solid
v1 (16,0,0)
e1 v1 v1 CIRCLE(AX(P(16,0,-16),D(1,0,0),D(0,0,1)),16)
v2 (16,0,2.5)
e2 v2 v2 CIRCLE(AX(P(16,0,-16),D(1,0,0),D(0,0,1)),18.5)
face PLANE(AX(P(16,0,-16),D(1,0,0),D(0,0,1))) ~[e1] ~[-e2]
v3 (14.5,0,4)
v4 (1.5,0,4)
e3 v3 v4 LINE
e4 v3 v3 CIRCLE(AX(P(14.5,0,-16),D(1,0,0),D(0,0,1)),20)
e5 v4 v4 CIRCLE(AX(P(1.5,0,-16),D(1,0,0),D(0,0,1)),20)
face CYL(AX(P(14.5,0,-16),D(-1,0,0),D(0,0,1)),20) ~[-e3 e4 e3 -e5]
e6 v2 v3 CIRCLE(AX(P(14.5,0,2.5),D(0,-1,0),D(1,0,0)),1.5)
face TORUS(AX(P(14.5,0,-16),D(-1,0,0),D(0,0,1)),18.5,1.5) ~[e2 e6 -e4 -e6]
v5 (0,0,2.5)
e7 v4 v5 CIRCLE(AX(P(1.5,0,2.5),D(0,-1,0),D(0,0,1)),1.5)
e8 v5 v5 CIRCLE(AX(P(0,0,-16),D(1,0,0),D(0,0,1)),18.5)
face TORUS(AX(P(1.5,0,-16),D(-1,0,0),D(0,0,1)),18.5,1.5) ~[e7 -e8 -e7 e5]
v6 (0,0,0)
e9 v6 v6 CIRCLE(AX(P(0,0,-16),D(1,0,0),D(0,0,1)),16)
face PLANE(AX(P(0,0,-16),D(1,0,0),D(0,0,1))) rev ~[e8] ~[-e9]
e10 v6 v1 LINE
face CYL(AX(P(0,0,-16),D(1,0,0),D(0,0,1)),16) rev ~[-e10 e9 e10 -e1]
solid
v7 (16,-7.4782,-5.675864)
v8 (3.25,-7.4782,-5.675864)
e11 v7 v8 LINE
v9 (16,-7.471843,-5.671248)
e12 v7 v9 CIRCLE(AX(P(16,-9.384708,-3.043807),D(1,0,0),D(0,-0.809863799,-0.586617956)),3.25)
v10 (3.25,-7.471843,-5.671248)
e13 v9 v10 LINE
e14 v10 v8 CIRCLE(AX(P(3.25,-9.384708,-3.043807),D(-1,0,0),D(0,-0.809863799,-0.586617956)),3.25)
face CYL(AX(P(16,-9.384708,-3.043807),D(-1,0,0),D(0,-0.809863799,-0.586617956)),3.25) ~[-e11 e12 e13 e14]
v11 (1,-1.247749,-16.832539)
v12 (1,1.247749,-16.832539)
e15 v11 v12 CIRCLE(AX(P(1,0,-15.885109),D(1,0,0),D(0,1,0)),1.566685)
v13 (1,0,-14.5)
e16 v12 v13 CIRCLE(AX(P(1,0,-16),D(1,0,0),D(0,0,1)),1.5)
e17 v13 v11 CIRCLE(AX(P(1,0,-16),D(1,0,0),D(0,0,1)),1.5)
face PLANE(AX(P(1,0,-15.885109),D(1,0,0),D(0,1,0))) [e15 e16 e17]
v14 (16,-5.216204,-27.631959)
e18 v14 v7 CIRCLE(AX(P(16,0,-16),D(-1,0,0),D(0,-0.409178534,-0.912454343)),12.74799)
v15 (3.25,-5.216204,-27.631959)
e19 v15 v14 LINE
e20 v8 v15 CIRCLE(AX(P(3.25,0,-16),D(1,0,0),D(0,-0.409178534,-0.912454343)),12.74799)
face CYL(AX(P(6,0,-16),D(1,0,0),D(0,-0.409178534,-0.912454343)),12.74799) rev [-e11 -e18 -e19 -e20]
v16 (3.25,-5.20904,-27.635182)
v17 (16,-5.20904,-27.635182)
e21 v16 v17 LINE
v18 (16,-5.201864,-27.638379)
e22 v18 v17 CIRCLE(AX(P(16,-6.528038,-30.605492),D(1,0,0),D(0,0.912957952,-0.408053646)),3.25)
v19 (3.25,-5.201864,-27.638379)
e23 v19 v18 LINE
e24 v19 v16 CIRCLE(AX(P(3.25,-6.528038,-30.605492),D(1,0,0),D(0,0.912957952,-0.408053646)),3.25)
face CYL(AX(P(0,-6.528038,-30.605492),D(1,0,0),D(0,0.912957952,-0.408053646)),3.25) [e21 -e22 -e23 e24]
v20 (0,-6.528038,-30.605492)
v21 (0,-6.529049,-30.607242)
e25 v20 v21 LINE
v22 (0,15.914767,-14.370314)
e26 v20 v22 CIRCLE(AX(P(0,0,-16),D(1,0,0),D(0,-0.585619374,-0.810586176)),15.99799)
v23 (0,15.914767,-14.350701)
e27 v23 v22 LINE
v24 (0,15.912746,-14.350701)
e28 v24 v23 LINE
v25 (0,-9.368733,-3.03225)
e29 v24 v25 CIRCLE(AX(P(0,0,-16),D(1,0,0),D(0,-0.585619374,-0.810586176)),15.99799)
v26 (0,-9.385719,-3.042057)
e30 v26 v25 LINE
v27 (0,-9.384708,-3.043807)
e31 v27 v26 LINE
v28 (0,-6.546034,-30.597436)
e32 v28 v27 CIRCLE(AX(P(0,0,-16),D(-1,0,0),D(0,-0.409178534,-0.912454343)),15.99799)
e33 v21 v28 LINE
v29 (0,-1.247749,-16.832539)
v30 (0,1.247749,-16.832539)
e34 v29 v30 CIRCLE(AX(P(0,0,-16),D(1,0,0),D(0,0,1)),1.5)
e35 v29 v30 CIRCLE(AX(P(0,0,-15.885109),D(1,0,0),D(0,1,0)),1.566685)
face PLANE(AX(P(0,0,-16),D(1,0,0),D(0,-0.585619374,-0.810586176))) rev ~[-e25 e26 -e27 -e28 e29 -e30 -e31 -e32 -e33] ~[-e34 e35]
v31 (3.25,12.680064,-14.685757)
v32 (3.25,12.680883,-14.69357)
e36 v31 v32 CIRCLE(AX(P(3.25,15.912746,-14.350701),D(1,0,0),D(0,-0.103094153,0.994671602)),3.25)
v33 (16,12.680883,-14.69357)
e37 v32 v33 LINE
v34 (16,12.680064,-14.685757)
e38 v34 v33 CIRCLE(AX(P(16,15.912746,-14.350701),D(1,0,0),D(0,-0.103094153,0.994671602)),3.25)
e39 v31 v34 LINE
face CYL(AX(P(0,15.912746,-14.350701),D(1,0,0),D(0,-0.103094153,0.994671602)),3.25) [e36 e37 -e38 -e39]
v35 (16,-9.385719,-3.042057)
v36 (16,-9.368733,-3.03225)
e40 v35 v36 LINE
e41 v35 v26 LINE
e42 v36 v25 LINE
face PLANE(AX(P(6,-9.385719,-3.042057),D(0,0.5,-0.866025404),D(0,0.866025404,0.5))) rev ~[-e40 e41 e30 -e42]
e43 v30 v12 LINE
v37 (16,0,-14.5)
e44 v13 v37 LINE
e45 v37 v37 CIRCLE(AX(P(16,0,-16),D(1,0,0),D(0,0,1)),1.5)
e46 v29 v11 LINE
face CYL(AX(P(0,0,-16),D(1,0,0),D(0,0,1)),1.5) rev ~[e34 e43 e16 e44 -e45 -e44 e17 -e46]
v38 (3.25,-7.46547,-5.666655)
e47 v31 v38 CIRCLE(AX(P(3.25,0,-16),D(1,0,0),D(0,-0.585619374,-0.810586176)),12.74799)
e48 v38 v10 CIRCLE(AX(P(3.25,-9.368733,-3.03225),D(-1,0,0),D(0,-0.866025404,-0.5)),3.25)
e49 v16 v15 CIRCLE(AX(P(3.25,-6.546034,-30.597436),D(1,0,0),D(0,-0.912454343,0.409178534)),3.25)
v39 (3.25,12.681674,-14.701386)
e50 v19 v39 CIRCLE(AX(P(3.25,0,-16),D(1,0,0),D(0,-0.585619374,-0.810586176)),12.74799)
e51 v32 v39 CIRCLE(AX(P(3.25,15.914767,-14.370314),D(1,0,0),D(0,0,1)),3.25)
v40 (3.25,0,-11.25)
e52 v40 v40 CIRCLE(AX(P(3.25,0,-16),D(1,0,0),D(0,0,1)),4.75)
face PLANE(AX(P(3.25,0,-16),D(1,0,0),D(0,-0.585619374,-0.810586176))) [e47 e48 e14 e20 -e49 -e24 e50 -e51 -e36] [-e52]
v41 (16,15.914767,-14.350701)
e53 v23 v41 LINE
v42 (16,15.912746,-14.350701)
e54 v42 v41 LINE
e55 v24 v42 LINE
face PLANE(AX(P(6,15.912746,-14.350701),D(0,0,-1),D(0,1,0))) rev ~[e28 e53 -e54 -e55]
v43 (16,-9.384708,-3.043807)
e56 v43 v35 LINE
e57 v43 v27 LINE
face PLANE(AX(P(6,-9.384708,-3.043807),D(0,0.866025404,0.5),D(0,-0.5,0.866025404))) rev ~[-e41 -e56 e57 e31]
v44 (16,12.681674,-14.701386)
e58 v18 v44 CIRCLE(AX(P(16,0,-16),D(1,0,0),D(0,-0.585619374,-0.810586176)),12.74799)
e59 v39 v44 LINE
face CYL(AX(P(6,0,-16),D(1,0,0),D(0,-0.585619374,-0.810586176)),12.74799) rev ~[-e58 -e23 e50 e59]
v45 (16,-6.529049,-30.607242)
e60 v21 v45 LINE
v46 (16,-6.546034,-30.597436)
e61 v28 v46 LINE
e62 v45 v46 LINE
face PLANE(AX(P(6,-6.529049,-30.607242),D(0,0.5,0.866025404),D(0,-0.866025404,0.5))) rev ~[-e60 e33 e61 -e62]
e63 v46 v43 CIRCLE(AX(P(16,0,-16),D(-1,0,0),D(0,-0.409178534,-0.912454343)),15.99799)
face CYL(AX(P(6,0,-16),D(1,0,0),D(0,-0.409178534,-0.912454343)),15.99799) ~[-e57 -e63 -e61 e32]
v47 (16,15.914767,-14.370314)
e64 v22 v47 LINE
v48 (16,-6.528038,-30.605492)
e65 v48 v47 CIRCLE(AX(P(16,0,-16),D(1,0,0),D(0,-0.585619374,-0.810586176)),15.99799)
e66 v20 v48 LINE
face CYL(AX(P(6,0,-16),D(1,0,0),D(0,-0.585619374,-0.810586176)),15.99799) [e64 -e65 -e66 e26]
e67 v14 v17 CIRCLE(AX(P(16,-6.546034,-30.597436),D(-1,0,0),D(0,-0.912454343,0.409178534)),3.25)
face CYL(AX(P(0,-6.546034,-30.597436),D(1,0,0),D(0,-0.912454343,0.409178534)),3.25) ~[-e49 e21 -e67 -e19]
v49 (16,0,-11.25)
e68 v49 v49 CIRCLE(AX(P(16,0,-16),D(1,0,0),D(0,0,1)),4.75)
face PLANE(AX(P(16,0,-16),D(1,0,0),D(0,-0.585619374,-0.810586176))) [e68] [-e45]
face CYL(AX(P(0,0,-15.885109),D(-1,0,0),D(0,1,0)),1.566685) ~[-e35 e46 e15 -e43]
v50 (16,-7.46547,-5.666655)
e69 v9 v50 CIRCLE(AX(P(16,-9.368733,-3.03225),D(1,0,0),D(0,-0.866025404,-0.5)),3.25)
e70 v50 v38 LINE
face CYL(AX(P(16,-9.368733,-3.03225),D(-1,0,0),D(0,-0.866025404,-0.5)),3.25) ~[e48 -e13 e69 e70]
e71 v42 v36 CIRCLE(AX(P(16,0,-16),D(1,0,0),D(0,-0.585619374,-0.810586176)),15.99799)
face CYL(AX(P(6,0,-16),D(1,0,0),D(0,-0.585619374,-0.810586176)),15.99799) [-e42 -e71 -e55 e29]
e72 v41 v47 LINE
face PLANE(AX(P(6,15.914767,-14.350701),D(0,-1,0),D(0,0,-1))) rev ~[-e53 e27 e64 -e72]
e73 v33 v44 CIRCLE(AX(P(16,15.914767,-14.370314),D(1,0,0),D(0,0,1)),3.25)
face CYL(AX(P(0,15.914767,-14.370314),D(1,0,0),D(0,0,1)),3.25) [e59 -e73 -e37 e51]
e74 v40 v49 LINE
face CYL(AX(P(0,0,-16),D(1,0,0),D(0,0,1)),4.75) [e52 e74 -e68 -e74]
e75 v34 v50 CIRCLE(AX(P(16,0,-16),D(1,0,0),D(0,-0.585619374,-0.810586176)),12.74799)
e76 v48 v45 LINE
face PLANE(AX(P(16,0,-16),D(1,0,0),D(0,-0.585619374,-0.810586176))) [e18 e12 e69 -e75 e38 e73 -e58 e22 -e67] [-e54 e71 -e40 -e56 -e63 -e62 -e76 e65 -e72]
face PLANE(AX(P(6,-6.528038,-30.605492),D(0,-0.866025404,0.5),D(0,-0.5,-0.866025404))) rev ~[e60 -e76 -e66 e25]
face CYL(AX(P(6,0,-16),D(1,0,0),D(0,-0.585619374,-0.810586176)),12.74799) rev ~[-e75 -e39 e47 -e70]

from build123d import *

# Parameters (mm, degrees)
F0_W      = 4
F0_H      = 1.5
F0_W_2    = 6
F0_H_2    = 2.5
F3_DEPTH  = 4
F4_R      = 1.5666851265
F5_DEPTH  = 1
F3_FACE_W = 4
F3_FACE_H = 10.6617561789
F7_DEPTH  = 6
F8_DEPTH  = 6
F9_T      = -3.25


with BuildPart() as f1:
    # F0 (on Front) → F1 (revolve)
    with BuildSketch(Plane.XZ):
        with BuildLine():
            Line((0, 2.5), (0, 0))
            Line((0, 0), (6, 0))
            Line((6, 0), (10, 0))
            Line((10, 0), (16, 0))
            Line((16, 0), (16, 2.5))
            ThreePointArc((16, 2.5), (15.5606601718, 3.5606601718), (14.5, 4))
            Line((14.5, 4), (1.5, 4))
            ThreePointArc((1.5, 4), (0.4393398282, 3.5606601718), (0, 2.5))
        make_face()
    revolve(axis=Axis((8, 0, -16), (1, 0, 0)))


with BuildPart() as f1b:
    # F0 (on Front) → F1, piece 2 (revolve)
    with BuildSketch(Plane.XZ):
        with Locations((8, -13.75)):
            Rectangle(F0_W, F0_H)
        with Locations((3, -13.75)):
            Rectangle(F0_W_2, F0_H)
        with Locations((8, -11.75)):
            Rectangle(F0_W, F0_H_2)
        with Locations((13, -13.75)):
            Rectangle(F0_W_2, F0_H)
    revolve(axis=Axis((8, 0, -16), (1, 0, 0)))

    # F2 (on face) → F3 (join)
    with BuildSketch(Plane(origin=(6, 0, 0), x_dir=(0, -1, 0), z_dir=(-1, 0, 0))):
        with BuildLine():
            Line((6.6908253366, -1.4861596642), (1.3844372123, -10.6770935002))
            ThreePointArc((1.3844372123, -10.6770935002), (2.8339033039, -11.2862974145), (4.051778006, -12.2807131073))
            Line((4.051778006, -12.2807131073), (9.3857185908, -3.0420570099))
            Line((9.3857185908, -3.0420570099), (6.6908253366, -1.4861596642))
        make_face()
        with BuildLine():
            ThreePointArc((4.037854872, -19.7343979479), (2.741097896, -20.7682682731), (1.1951079301, -21.36858613))
            Line((1.1951079301, -21.36858613), (6.5290485149, -30.6072422274))
            Line((6.5290485149, -30.6072422274), (9.3687329614, -28.9677496478))
            Line((9.3687329614, -28.9677496478), (4.037854872, -19.7343979479))
        make_face()
        with BuildLine():
            ThreePointArc((-5.3019908569, -17.4624954541), (-5.4991378368, -15.9026190397), (-5.246885936, -14.3507007627))
            Line((-5.246885936, -14.3507007627), (-15.9147671056, -14.3507007627))
            Line((-15.9147671056, -14.3507007627), (-15.9147671056, -17.4624954541))
            Line((-15.9147671056, -17.4624954541), (-5.3019908569, -17.4624954541))
        make_face()
    extrude(amount=-F3_DEPTH)

    # F4 (on Right) → F5 (join)
    with BuildSketch(Plane.YZ):
        with Locations((0, -15.8851090819)):
            Circle(F4_R)
    extrude(amount=F5_DEPTH)

    # F3_face (on face) → F6 (revolve)
    with BuildSketch(Plane(origin=(8, -6.7032939167, -24.3510737978), x_dir=(1, 0, 0), z_dir=(0, -0.8660254038, 0.5))):
        Rectangle(F3_FACE_W, F3_FACE_H)
    revolve(axis=Axis((16, 0, -16), (1, 0, 0)))

    # F7 (add): a face of the model
    f7_faces = [f1b.faces().sort_by_distance(p)[0] for p in [
        (10, 6.3521420728, -1.8115251344),
    ]]
    extrude(f7_faces, amount=F7_DEPTH)

    # F8 (add): a face of the model
    f8_faces = [f1b.faces().sort_by_distance(p)[0] for p in [
        (6, 0, -19.4524914923),
    ]]
    extrude(f8_faces, amount=F8_DEPTH)

    # F9
    f9_openings = [f1b.faces().sort_by_distance(p)[0] for p in [
        (16, 0, -17.952491),
    ]]
    offset(amount=F9_T, openings=f9_openings)


solid = Compound([f1.part, f1b.part])
